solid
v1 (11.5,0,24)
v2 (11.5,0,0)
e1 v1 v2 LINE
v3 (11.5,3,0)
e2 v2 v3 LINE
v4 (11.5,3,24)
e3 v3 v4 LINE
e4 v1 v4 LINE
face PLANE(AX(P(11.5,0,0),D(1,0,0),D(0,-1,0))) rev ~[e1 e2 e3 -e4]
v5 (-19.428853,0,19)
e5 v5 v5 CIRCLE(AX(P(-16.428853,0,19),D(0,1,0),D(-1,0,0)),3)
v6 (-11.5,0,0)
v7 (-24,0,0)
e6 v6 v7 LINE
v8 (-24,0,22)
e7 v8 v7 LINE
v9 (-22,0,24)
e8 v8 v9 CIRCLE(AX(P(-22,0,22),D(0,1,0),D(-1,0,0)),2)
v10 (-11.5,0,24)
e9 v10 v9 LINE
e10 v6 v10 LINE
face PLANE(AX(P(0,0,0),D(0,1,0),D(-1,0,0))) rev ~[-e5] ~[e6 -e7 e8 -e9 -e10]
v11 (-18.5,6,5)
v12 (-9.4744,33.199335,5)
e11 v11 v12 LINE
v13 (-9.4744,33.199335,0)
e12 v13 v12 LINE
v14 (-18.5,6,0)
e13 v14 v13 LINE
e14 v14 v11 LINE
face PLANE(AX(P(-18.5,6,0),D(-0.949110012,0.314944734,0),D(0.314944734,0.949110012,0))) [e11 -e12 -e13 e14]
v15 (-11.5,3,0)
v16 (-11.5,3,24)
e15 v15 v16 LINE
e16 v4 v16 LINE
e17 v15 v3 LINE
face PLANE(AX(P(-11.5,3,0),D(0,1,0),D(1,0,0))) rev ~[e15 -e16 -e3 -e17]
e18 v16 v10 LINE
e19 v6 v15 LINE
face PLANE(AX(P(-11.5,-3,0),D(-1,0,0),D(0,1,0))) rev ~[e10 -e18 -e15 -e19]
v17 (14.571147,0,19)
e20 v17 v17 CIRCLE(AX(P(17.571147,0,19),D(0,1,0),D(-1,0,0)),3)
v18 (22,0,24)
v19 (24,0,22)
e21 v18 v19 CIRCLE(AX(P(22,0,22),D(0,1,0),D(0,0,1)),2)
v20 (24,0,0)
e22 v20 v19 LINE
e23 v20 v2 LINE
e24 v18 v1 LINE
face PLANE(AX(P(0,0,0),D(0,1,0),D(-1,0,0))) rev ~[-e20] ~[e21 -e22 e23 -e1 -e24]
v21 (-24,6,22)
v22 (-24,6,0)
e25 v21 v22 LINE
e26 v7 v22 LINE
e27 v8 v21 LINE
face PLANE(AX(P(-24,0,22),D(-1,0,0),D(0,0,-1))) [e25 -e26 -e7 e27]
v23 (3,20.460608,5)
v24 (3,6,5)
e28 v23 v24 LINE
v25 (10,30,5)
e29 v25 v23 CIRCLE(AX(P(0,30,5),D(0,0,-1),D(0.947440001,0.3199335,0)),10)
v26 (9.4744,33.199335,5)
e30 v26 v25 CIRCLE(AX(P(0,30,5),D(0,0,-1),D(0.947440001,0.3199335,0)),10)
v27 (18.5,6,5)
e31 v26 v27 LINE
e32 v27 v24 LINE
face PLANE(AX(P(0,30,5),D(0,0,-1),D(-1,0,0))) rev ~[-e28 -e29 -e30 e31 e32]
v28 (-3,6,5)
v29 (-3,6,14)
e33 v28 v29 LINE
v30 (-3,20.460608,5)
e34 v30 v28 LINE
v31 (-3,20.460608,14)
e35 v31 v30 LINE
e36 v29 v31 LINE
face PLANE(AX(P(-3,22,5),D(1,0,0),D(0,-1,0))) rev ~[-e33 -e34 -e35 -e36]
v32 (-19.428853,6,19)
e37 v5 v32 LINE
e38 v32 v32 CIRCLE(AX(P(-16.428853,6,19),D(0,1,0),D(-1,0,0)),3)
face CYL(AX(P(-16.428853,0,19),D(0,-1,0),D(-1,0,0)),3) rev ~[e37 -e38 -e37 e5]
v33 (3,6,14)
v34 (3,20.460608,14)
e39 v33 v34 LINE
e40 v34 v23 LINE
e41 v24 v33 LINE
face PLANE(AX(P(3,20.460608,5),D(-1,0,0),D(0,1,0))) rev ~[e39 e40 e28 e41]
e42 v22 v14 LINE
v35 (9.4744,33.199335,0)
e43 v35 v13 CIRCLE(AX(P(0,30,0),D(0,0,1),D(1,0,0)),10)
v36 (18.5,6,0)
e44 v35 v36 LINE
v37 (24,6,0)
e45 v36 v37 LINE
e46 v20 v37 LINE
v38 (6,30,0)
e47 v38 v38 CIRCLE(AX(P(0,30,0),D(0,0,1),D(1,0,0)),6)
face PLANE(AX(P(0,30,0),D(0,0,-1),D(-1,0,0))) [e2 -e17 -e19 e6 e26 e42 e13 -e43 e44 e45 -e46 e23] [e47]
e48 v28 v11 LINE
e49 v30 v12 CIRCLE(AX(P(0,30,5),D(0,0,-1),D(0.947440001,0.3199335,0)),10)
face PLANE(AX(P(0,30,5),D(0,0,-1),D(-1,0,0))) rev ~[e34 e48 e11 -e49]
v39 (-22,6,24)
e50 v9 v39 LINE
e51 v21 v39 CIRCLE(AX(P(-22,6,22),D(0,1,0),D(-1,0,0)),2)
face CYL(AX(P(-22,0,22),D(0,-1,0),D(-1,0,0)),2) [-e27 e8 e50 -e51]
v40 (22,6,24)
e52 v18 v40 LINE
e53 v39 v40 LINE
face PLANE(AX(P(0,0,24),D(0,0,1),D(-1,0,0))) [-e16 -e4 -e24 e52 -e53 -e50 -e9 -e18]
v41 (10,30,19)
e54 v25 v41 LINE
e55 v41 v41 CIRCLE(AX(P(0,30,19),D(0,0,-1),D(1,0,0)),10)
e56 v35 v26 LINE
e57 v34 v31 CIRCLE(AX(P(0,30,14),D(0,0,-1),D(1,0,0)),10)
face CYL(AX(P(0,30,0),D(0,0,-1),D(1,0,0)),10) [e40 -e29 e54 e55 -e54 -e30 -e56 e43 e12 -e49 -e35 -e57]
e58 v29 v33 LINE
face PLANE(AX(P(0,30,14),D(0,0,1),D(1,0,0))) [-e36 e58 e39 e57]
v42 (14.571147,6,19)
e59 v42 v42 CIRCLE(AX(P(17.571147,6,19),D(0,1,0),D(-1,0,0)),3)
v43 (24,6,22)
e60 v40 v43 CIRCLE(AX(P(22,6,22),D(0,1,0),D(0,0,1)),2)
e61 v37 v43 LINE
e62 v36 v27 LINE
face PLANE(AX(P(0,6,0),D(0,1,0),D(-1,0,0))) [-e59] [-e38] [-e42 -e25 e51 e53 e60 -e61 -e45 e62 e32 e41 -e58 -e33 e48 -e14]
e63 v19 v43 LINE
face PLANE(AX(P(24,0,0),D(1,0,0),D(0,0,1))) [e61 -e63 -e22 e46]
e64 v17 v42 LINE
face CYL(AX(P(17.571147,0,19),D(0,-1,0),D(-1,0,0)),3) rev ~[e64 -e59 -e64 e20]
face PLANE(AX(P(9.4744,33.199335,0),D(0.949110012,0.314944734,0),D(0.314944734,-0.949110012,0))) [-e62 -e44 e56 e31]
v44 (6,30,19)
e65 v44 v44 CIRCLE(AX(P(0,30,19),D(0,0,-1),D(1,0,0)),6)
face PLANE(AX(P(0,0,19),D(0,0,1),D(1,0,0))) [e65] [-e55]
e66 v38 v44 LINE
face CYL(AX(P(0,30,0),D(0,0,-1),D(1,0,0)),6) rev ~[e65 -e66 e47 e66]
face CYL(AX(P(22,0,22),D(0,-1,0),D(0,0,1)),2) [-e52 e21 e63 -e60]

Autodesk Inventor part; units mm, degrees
ref_plane "YZ Plane" through (0, 0, 0) normal (1, 0, 0) x (0, 1, 0)
ref_plane "XZ Plane" through (0, 0, 0) normal (0, 1, 0) x (-1, 0, 0)
ref_plane "XY Plane" through (0, 0, 0) normal (0, 0, 1) x (1, 0, 0)
sketch "草图1" plane through (0, 0, 0) normal (0, 1, 0) x (-1, 0, 0)
  line L0 (24, 0) -> (-24, 0)
  line L1 (-24, 0) -> (-24, 22)
  line L2 (-22, 24) -> (22, 24)
  line L3 (24, 22) -> (24, 0)
  line L4 (0, 29.295577) -> (0, -8.008859)
  arc A0 (24, 22) -> (22, 24) centre (22, 22) ccw
  arc A1 (-22, 24) -> (-24, 22) centre (-22, 22) ccw
  line L5 (28.197943, 19) -> (-37.870085, 19) construction
  circle A2 centre (16.428853, 19) radius 3
  circle A3 centre (-17.571147, 19) radius 3
  point P0 (0, 0)
  point P1 (-24, 24)
  dimension "d0" = 24
  dimension "d1" = 48
  dimension "d2" = 2
  dimension "d3" = 5
  dimension "d4" = 6
  dimension "d5" = 6
  dimension "d6" = 34
extrude "拉伸1" add sketch "草图1" along normal blind 6
sketch "草图2" plane through (0, 0, 0) normal (0, 0, 1) x (1, 0, 0)
  line L0 (22, 0) -> (-22, 0) projected
  line L1 (22, 0) -> (22, 6) projected
  line L2 (-22, 6) -> (22, 6) projected
  line L3 (-22, 0) -> (-22, 6) projected
  line L4 (11.5, -3) -> (-11.5, -3)
  line L5 (-11.5, -3) -> (-11.5, 3)
  line L6 (-11.5, 3) -> (11.5, 3)
  line L7 (11.5, 3) -> (11.5, -3)
  line L8 (11.5, -3) -> (-11.5, 3) construction
  line L9 (-11.5, -3) -> (11.5, 3) construction
  point P0 (0, 0)
  dimension "d9" = 23
  dimension "d10" = 6
extrude "拉伸2" cut sketch "草图2" along normal blind 30 contours L7 L4 L5 L0 | L0 L5 L6 L7
sketch "草图3" plane through (0, 0, 0) normal (0, 0, 1) x (1, 0, 0)
  circle A0 centre (0, 30) radius 10
  line L0 (11.5, 3) -> (11.5, 0)
  line L1 (22, 0) -> (11.5, 0)
  line L2 (22, 0) -> (22, 6)
  line L3 (-22, 6) -> (22, 6)
  line L4 (-22, 0) -> (-22, 6)
  line L5 (-11.5, 0) -> (-22, 0)
  line L6 (-11.5, 0) -> (-11.5, 3)
  line L7 (-11.5, 3) -> (11.5, 3)
  line L8 (0, -6.997144) -> (0, 46.686565)
  circle A1 centre (0, 30) radius 6
  point P0 (0, 0)
  dimension "d13" = 20
  dimension "d14" = 30
  dimension "d15" = 12
extrude "拉伸3" add sketch "草图3" along normal blind 19 contours A0 L8 A1 | L8 A1 A0
sketch "草图4" plane through (0, 30, 0) normal (0, 0, -1) x (-1, 0, 0)
  circle A0 centre (0, 0) radius 10
  line L0 (-11.5, -30) -> (-11.5, -27)
  line L1 (-11.5, -27) -> (11.5, -27)
  line L2 (11.5, -27) -> (11.5, -30)
  line L3 (24, -30) -> (11.5, -30)
  line L4 (24, -30) -> (24, -24)
  line L5 (-24, -24) -> (24, -24)
  line L6 (-24, -30) -> (-24, -24)
  line L7 (-11.5, -30) -> (-24, -30)
  line L8 (-9.4744, 3.199335) -> (-18.5, -24)
  line L9 (9.4744, 3.199335) -> (18.5, -24)
  line L10 (0, -31.113393) -> (0, 9.909735)
  point P0 (0, -30)
  dimension "d18" = 37
sketch "草图4 outline for 拉伸4" plane through (0, 30, 0) normal (0, 0, -1) x (-1, 0, 0)
  line L0 (18.5, -24) -> (9.4744, 3.199335)
  line L1 (-18.5, -24) -> (18.5, -24)
  line L2 (-9.4744, 3.199335) -> (-18.5, -24)
  arc A0 (-9.4744, 3.199335) -> (9.4744, 3.199335) centre (0, 0) ccw
extrude "拉伸4" add sketch "草图4 outline for 拉伸4" against normal blind 5
sketch "草图5" plane through (0, 30, 5) normal (0, 0, 1) x (1, 0, 0)
  arc A0 (-9.507538, 3.099472) -> (9.507538, 3.099472) centre (0, 0) ccw
  line L0 (18.5, -24) -> (-18.5, -24)
  line L1 (3, -8) -> (-3, -8)
  line L2 (-3, -8) -> (-3, -24)
  line L3 (-3, -24) -> (3, -24)
  line L4 (3, -24) -> (3, -8)
  line L5 (3, -8) -> (-3, -24) construction
  line L6 (-3, -8) -> (3, -24) construction
  line L7 (0, -30) -> (0, 0)
  point P0 (0, -16)
  point P1 (0, -16)
  dimension "d21" = 16
  dimension "d22" = 6
extrude "拉伸5" add sketch "草图5" along normal blind 9
